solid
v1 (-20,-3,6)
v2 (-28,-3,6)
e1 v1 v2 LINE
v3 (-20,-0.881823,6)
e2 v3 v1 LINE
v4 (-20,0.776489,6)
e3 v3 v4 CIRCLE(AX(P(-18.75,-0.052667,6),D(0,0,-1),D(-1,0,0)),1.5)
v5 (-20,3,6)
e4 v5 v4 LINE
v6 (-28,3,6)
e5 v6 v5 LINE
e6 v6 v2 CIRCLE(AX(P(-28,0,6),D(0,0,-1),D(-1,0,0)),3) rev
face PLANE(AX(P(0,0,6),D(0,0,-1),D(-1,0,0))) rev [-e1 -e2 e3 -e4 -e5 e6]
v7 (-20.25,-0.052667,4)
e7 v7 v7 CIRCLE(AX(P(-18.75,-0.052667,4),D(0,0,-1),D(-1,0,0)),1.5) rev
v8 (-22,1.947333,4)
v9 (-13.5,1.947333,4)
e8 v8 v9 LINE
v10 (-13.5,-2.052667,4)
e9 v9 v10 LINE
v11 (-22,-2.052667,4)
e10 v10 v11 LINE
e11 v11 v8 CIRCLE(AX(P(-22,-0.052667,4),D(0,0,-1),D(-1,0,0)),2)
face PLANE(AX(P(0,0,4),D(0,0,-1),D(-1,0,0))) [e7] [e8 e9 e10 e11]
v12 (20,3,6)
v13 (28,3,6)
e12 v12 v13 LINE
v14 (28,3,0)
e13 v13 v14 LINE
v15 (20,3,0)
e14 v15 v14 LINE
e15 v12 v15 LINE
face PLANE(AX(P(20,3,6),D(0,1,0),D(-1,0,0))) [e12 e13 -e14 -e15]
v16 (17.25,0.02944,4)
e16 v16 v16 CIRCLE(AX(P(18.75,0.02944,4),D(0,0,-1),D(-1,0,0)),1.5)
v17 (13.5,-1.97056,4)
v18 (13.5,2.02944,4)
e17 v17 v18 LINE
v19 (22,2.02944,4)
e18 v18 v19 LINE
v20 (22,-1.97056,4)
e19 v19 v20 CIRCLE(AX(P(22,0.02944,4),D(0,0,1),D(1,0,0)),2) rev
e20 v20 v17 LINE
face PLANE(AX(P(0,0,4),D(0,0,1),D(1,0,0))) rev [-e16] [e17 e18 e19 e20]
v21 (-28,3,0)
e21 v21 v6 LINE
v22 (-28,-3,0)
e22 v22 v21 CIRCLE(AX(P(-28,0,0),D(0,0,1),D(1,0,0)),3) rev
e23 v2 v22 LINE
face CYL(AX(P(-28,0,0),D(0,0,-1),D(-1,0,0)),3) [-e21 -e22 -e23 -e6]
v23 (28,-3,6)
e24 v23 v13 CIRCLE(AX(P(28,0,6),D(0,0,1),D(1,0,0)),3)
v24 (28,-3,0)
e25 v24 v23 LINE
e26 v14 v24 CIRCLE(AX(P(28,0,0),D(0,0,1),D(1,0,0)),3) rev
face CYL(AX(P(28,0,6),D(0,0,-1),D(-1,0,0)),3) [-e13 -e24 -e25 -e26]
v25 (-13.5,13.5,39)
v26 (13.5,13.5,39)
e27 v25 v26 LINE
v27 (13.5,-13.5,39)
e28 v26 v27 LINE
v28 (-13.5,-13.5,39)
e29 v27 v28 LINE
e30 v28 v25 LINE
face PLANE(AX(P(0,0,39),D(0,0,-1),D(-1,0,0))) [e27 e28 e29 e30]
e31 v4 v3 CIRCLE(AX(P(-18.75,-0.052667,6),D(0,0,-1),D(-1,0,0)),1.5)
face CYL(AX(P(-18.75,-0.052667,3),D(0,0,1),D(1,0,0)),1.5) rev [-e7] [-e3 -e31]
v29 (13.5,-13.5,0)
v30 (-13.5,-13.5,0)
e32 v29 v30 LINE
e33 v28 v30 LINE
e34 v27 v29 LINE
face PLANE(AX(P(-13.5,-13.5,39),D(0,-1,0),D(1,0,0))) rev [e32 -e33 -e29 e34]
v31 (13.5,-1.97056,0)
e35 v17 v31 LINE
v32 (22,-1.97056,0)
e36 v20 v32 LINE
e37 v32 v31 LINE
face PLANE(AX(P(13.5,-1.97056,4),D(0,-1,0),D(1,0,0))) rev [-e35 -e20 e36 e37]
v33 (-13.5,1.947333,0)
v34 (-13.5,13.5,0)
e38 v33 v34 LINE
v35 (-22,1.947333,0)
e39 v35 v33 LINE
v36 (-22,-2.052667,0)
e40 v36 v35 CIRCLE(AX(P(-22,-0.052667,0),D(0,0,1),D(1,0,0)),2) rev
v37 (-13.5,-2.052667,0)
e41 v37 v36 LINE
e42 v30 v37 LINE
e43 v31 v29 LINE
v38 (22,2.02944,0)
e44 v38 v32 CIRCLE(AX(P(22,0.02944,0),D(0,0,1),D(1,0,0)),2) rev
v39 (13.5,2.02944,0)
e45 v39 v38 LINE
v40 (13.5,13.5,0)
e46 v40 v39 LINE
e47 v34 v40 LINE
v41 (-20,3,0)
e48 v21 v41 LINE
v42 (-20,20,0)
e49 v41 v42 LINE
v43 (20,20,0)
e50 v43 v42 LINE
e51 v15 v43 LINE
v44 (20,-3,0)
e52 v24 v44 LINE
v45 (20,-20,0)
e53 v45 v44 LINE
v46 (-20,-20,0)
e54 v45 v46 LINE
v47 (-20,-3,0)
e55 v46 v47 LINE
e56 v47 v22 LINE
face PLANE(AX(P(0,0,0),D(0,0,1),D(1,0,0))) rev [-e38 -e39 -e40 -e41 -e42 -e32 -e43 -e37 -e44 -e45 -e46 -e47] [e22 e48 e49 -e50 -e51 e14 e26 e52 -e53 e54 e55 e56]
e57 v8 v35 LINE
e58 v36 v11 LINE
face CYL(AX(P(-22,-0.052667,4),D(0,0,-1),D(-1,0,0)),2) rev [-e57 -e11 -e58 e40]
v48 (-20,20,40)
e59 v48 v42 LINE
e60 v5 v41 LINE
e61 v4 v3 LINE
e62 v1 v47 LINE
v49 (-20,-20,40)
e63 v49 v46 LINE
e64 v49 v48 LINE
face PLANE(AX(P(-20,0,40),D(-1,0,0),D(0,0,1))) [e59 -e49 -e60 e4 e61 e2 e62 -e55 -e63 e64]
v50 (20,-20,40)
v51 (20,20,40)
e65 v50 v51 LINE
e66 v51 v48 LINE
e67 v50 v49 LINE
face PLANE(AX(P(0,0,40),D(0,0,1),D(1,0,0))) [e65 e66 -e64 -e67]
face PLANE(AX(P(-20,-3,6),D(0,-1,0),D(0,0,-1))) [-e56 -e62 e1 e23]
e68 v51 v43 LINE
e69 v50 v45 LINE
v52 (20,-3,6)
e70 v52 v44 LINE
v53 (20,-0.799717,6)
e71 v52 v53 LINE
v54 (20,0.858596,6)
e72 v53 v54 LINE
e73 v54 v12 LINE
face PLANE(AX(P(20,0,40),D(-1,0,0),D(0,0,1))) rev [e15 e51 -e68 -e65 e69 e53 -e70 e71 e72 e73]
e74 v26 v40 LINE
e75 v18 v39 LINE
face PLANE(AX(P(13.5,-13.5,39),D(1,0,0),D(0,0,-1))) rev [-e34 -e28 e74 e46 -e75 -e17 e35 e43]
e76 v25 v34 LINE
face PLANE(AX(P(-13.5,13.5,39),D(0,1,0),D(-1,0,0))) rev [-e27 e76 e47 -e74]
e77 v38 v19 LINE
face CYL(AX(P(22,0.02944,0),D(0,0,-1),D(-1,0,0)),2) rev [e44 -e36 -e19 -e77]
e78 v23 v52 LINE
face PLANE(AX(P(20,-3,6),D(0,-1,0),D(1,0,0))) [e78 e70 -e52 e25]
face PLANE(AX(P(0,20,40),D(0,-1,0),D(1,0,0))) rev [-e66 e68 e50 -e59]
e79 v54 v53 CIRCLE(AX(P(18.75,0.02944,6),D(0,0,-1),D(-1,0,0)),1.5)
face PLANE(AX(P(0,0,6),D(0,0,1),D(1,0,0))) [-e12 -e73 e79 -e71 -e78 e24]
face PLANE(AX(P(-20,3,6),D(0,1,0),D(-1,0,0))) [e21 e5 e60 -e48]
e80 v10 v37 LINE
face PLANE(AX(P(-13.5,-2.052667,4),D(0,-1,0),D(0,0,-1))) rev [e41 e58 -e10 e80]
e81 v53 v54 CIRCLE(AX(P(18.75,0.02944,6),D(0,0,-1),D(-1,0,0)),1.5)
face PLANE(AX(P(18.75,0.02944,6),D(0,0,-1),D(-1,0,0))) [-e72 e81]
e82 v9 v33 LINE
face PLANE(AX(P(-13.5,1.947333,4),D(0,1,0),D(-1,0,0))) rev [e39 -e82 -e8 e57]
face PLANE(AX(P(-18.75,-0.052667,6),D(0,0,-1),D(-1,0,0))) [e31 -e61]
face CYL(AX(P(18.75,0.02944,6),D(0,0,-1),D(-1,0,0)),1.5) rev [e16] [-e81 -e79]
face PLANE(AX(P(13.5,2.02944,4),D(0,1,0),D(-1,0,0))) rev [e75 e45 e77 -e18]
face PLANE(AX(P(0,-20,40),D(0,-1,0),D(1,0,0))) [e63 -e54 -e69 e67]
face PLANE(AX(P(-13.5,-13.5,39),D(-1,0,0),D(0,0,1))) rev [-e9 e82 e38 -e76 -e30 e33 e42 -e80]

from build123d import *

# Parameters (mm, degrees)
SKETCH1_W               = 40
SKETCH1_H               = 40
BOSS_EXTRUDE1_DEPTH     = 40
SKETCH2_W               = 27
SKETCH2_H               = 27
CUT_EXTRUDE1_DEPTH      = 39
SKETCH3_W               = 11
SKETCH3_H               = 6
BOSS_EXTRUDE3_DEPTH     = 6
SKETCH6_W               = 10.5
SKETCH6_H               = 4
CUT_EXTRUDE2_DEPTH      = 4
SKETCH7_W               = 10.5
SKETCH7_H               = 4
CUT_EXTRUDE3_DEPTH      = 4
SKETCH9_R               = 1.5
CUT_EXTRUDE4_DEPTH      = 2
CUT_EXTRUDE5_DEPTH      = 1
CUT_EXTRUDE5_DEPTH_BACK = 2
SKETCH10_R              = 1.5
FILLET3_RADIUS          = 3
FILLET3_LENGTH          = 6
FILLET4_R               = 2
FILLET6_RADIUS          = 3
FILLET6_LENGTH          = 6
FILLET7_R               = 2


with BuildPart() as part:
    # Sketch1 → Boss-Extrude1 (new body)
    with BuildSketch(Plane.XY):
        Rectangle(SKETCH1_W, SKETCH1_H)
    extrude(amount=BOSS_EXTRUDE1_DEPTH)

    # Sketch2 → Cut-Extrude1 (cut)
    with BuildSketch(Plane(origin=(0, 0, 0), x_dir=(-1, 0, 0), z_dir=(0, 0, -1))):
        Rectangle(SKETCH2_W, SKETCH2_H)
    extrude(amount=-CUT_EXTRUDE1_DEPTH, mode=Mode.SUBTRACT)

    # Sketch3 → Boss-Extrude3 (add)
    with BuildSketch(Plane(origin=(0, 0, 0), x_dir=(-1, 0, 0), z_dir=(0, 0, -1))):
        Polygon((-20, 0), (-20, 3), (-31, 3), (-31, 0), (-31, -3), (-20, -3), align=None)
        with Locations((25.5, 0)):
            Rectangle(SKETCH3_W, SKETCH3_H)
    extrude(amount=-BOSS_EXTRUDE3_DEPTH)

    # Sketch6 → Cut-Extrude2 (cut)
    with BuildSketch(Plane(origin=(0, 0, 0), x_dir=(-1, 0, 0), z_dir=(0, 0, -1))):
        with Locations((-18.75, 0.029439605)):
            Rectangle(SKETCH6_W, SKETCH6_H)
    extrude(amount=-CUT_EXTRUDE2_DEPTH, mode=Mode.SUBTRACT)

    # Sketch7 → Cut-Extrude3 (cut)
    with BuildSketch(Plane(origin=(0, 0, 0), x_dir=(-1, 0, 0), z_dir=(0, 0, -1))):
        with Locations((18.75, -0.052667078)):
            Rectangle(SKETCH7_W, SKETCH7_H)
    extrude(amount=-CUT_EXTRUDE3_DEPTH, mode=Mode.SUBTRACT)

    # Sketch9 → Cut-Extrude4 (cut)
    with BuildSketch(Plane(origin=(0, 0, 4), x_dir=(-1, 0, 0), z_dir=(0, 0, -1))):
        with Locations((-18.75, 0.029439605)):
            Circle(SKETCH9_R)
    extrude(amount=-CUT_EXTRUDE4_DEPTH, mode=Mode.SUBTRACT)

    # Sketch10 → Cut-Extrude5 (cut, two sides: drawn at the far end of the back side and taken through both)
    with BuildSketch(Plane(origin=(0, 0, 4), x_dir=(-1, 0, 0), z_dir=(0, 0, -1)).offset(-CUT_EXTRUDE5_DEPTH_BACK)):
        with Locations(Location((18.75, -0.052667078, 0), (0, 0, 33.557309762))):
            Circle(SKETCH10_R)
    extrude(amount=CUT_EXTRUDE5_DEPTH + CUT_EXTRUDE5_DEPTH_BACK, mode=Mode.SUBTRACT)

    # Fillet3: full round fillet: the end face becomes a half cylinder, R = half its width
    fillet3_face = Plane((31, 0, 3), x_dir=(0, 0, -1), z_dir=(1, 0, 0))  # on the end face: x along it, z out of the body
    fillet3_slab = fillet3_face.offset(-FILLET3_RADIUS / 2) * Box(FILLET3_LENGTH, 2 * FILLET3_RADIUS, FILLET3_RADIUS, mode=Mode.PRIVATE)  # the body's end, R deep
    fillet3_round = Plane((28, 0, 3), x_dir=(1, 0, 0), z_dir=(0, 0, -1)) * Cylinder(FILLET3_RADIUS, FILLET3_LENGTH, mode=Mode.PRIVATE)  # its axis R under the face
    add(fillet3_slab - fillet3_round, mode=Mode.SUBTRACT)

    # Fillet4
    fillet4_edges = [part.edges().sort_by_distance(p)[0] for p in [
        (24, -1.970560395, 2),
        (24, 2.029439605, 2),
    ]]
    fillet(fillet4_edges, radius=FILLET4_R - 0.0001)  # a hair under: the kernel refuses the full size

    # Fillet6: full round fillet: the end face becomes a half cylinder, R = half its width
    fillet6_face = Plane((-31, 0, 3), x_dir=(0, 0, -1), z_dir=(-1, 0, 0))  # on the end face: x along it, z out of the body
    fillet6_slab = fillet6_face.offset(-FILLET6_RADIUS / 2) * Box(FILLET6_LENGTH, 2 * FILLET6_RADIUS, FILLET6_RADIUS, mode=Mode.PRIVATE)  # the body's end, R deep
    fillet6_round = Plane((-28, 0, 3), x_dir=(-1, 0, 0), z_dir=(0, 0, -1)) * Cylinder(FILLET6_RADIUS, FILLET6_LENGTH, mode=Mode.PRIVATE)  # its axis R under the face
    add(fillet6_slab - fillet6_round, mode=Mode.SUBTRACT)

    # Fillet7
    fillet7_edges = [part.edges().sort_by_distance(p)[0] for p in [
        (-24, 1.947332922, 2),
        (-24, -2.052667078, 2),
    ]]
    fillet(fillet7_edges, radius=FILLET7_R - 0.0001)  # a hair under: the kernel refuses the full size


solid = part.part
